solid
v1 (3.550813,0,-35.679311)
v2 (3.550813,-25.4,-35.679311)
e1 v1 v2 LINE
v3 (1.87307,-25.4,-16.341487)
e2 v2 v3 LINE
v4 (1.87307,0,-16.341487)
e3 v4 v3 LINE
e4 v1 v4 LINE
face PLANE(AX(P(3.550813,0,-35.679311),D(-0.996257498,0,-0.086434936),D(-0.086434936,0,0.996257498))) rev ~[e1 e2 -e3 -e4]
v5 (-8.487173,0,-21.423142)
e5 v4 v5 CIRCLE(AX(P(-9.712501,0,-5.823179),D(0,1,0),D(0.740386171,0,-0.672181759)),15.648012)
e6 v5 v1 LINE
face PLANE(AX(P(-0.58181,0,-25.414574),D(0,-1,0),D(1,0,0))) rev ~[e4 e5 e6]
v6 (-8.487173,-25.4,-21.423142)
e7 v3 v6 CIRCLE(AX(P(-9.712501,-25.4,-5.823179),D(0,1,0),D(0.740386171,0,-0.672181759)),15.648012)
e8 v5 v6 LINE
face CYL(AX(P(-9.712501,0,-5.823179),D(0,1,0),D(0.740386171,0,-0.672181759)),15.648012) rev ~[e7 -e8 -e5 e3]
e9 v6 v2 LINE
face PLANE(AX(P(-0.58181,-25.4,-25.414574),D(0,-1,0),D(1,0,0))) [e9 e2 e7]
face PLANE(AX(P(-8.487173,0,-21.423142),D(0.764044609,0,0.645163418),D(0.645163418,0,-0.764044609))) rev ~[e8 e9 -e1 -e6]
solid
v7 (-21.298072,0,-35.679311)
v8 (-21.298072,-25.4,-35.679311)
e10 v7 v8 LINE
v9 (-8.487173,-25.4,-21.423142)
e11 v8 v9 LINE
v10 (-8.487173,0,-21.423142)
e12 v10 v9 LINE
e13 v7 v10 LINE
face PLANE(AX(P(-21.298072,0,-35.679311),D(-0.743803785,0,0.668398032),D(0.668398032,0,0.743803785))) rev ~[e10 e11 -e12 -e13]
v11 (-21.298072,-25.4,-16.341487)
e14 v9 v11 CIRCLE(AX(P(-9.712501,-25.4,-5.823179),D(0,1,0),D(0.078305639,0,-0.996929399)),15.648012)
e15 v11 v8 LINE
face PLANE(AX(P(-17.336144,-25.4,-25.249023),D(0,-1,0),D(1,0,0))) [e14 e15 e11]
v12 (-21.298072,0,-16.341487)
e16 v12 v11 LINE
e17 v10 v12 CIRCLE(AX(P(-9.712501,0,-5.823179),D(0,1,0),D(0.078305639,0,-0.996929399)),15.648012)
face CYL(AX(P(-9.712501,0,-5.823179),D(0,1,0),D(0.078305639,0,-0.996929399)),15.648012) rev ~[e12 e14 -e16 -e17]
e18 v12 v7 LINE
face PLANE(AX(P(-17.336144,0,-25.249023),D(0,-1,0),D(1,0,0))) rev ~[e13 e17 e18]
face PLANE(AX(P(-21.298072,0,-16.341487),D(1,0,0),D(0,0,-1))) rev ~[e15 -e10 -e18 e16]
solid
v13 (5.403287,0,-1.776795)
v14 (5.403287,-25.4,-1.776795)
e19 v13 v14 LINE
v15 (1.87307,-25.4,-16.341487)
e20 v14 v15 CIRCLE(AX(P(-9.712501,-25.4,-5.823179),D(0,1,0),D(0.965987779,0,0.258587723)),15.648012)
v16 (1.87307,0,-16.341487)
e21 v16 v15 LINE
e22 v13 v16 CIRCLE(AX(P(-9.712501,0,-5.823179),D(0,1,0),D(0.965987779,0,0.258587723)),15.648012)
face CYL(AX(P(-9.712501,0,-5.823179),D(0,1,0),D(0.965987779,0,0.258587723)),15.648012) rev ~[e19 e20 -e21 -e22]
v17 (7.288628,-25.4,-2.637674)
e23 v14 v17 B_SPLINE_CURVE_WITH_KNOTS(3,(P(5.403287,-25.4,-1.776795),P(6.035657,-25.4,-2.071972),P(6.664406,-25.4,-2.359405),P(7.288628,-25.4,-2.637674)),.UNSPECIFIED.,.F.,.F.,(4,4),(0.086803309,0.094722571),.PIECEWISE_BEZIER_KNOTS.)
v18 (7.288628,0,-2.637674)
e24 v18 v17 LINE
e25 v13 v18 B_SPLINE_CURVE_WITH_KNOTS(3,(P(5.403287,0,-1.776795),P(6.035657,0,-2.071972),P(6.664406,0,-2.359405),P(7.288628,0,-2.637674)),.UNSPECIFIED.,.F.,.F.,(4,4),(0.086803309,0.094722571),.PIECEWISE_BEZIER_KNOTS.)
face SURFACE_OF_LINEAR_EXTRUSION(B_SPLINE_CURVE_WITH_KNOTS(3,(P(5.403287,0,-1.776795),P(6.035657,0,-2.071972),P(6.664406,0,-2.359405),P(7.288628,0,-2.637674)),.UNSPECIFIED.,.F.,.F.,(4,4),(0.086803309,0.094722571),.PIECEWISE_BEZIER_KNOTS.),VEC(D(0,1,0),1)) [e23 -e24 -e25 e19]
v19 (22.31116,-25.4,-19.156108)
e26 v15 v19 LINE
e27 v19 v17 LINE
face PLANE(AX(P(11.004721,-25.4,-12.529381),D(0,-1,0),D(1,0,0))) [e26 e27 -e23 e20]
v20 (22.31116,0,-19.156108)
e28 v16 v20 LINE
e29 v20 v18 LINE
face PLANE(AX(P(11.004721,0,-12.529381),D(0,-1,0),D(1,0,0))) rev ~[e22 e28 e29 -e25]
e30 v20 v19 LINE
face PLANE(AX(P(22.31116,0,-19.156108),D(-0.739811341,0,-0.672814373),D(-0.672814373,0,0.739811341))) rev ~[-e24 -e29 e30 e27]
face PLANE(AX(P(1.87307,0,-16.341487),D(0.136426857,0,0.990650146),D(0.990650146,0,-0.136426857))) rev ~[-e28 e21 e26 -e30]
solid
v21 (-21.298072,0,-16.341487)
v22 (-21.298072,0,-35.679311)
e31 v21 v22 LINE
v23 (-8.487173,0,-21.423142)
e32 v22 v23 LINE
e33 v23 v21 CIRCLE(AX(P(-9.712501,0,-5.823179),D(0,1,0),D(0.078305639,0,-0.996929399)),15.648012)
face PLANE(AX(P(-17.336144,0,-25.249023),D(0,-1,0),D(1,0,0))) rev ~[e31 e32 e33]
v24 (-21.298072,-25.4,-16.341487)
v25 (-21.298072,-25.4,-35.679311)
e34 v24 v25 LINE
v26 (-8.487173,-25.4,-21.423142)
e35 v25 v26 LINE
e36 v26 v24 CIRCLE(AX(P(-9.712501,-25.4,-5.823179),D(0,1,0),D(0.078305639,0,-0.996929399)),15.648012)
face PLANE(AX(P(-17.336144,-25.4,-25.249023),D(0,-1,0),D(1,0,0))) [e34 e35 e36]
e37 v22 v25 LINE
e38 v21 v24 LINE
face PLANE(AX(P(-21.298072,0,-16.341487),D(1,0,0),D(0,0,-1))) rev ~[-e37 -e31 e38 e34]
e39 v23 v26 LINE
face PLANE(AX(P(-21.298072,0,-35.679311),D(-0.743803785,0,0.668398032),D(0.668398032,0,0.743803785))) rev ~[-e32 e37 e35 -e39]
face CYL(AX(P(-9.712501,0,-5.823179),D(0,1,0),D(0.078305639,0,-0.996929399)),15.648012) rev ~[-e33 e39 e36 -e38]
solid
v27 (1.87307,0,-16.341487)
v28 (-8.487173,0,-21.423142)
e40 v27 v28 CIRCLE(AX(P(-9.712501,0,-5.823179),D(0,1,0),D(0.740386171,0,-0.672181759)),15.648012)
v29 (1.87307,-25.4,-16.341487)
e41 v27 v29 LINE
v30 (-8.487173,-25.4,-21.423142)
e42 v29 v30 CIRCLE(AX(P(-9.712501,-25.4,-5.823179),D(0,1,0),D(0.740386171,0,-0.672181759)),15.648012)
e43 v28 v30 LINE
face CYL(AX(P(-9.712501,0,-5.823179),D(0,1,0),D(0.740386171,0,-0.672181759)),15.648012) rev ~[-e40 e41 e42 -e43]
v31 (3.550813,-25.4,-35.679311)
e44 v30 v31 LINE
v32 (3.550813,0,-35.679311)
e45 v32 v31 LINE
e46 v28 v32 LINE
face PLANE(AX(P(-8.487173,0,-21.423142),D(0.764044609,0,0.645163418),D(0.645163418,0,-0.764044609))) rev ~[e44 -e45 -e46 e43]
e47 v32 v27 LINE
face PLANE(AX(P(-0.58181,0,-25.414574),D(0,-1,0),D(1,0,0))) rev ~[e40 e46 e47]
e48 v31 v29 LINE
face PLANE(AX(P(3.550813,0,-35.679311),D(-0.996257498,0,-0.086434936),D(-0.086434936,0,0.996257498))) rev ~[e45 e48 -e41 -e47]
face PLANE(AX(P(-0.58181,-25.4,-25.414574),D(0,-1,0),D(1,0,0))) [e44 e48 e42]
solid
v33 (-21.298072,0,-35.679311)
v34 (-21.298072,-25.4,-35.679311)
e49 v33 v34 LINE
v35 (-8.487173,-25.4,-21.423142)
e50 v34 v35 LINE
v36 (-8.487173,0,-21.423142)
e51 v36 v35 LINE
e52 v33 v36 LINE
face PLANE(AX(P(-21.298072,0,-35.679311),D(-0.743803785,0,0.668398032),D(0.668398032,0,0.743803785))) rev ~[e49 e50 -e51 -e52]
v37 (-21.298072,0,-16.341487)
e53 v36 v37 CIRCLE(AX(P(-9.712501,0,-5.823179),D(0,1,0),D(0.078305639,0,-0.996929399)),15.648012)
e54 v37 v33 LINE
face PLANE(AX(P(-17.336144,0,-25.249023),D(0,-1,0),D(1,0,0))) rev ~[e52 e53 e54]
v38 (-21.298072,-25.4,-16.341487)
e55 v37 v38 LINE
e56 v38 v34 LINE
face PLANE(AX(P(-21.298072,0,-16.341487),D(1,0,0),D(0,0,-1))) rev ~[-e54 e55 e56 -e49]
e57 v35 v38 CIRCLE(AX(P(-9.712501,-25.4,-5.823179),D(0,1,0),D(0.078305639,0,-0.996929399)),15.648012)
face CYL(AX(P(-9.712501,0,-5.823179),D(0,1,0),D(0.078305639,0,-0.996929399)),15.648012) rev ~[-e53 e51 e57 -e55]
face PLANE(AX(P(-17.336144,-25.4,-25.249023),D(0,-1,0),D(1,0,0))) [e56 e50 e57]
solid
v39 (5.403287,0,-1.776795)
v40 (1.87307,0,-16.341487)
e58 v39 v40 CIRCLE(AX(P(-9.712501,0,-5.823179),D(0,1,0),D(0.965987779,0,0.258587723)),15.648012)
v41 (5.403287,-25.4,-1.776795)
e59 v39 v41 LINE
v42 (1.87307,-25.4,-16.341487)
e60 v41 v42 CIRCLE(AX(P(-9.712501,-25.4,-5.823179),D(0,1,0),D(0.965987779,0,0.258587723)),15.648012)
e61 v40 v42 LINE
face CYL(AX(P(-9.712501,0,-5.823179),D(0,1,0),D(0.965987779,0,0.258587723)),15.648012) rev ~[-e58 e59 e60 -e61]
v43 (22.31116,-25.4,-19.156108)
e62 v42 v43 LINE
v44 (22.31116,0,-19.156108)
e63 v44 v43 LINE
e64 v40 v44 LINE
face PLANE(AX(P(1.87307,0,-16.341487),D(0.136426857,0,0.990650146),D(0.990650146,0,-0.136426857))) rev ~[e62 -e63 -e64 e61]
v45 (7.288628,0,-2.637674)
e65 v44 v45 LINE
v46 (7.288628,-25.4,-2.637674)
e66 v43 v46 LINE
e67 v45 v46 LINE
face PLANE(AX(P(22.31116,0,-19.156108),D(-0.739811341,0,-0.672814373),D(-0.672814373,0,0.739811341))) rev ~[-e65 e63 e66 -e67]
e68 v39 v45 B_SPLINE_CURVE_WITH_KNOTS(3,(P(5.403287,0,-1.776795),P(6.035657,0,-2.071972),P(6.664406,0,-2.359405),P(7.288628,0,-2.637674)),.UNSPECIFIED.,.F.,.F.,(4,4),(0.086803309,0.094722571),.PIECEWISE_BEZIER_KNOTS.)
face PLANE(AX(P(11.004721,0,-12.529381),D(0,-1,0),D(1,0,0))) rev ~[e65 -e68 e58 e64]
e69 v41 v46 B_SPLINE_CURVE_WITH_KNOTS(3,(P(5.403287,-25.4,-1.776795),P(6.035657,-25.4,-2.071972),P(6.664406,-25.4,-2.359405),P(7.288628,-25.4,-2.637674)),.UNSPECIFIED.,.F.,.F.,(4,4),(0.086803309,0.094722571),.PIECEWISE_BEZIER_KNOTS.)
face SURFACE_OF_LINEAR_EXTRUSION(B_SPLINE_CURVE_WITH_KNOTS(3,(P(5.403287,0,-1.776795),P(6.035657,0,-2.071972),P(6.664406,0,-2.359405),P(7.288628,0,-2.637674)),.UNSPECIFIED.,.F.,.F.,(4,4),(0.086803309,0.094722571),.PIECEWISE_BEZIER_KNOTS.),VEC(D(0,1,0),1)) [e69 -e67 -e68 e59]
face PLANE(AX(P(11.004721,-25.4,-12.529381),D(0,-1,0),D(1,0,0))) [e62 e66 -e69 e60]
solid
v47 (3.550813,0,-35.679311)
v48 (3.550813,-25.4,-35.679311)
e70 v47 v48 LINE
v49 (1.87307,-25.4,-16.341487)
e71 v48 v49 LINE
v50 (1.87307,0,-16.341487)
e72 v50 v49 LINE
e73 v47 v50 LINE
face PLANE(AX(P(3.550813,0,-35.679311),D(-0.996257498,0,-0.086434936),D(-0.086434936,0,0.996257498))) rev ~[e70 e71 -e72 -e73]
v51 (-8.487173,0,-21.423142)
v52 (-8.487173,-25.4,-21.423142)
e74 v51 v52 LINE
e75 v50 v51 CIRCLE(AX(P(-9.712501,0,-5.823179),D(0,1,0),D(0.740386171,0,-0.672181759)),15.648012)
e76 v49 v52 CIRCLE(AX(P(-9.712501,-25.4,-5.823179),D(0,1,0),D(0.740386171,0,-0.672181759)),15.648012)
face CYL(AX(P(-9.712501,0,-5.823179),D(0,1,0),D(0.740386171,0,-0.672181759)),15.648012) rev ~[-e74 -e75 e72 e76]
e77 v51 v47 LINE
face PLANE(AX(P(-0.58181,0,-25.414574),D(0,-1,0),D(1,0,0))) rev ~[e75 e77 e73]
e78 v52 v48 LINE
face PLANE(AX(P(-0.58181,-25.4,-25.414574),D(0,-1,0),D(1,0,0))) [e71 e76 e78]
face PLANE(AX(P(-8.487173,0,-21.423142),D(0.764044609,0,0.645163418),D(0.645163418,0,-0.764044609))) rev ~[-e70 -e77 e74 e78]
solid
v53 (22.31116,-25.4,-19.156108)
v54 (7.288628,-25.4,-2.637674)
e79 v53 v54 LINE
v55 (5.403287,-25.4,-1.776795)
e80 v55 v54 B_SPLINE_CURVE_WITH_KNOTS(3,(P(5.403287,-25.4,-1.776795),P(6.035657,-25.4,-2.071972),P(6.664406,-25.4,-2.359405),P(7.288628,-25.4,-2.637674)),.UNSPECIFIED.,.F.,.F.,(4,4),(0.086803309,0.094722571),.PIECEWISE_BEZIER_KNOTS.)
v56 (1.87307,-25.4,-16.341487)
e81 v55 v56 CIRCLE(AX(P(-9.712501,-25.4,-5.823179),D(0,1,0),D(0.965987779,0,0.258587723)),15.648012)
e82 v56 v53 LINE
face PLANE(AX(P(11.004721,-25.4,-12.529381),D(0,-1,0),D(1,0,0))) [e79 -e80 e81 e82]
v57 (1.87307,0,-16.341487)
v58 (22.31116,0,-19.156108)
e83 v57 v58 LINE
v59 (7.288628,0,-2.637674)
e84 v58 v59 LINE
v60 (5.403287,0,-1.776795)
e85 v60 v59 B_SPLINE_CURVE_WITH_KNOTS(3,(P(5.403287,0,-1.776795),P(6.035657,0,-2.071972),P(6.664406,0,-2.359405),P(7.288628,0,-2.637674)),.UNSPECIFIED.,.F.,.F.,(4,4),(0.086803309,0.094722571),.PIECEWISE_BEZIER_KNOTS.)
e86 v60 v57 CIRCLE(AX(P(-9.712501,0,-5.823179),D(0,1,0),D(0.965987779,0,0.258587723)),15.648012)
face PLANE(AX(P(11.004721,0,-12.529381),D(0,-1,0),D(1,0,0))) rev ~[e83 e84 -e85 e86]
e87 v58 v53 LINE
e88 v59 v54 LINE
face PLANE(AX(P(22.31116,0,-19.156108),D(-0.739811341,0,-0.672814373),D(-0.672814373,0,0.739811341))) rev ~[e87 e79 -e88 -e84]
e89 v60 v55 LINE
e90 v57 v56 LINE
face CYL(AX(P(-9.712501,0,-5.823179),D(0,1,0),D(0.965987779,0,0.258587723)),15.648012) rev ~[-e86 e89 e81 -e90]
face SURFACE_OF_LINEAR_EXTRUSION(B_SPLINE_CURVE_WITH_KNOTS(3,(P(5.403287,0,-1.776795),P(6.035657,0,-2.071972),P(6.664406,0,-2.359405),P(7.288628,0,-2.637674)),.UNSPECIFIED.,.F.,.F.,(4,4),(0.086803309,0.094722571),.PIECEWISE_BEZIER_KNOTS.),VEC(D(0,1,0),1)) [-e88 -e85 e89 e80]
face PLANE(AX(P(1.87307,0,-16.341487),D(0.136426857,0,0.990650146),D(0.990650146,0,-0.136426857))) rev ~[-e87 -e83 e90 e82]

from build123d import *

# Parameters (mm, degrees)
F2_DEPTH = 25.4
F3_DEPTH = 25.4
F4_DEPTH = 25.4


# Not quite as in the source:
# - the program builds the solid bodies; features that only make, move or delete a surface that nothing else refers to are left out


with BuildPart() as f2:
    # F0 (on Front) → F2 (new body)
    with BuildSketch(Plane.XZ):
        with BuildLine():
            Line((-21.2980724055, -35.6793105602), (-8.4871734768, -21.4231418318))
            ThreePointArc((-8.4871734768, -21.4231418318), (-15.4822035317, -20.368652553), (-21.2980724055, -16.3414870052))
            Line((-21.2980724055, -16.3414870052), (-21.2980724055, -35.6793105602))
        make_face()
    extrude(amount=F2_DEPTH)


with BuildPart() as f2b:
    # F0 (on Front) → F2, piece 2 (new body)
    with BuildSketch(Plane.XZ):
        with BuildLine():
            Line((3.5508128349, -35.6793105602), (1.8730703471, -16.3414870052))
            ThreePointArc((1.8730703471, -16.3414870052), (-2.8215223771, -19.8721889655), (-8.4871734768, -21.4231418318))
            Line((-8.4871734768, -21.4231418318), (3.5508128349, -35.6793105602))
        make_face()
    extrude(amount=F2_DEPTH)


with BuildPart() as f2c:
    # F0 (on Front) → F2, piece 3 (new body)
    with BuildSketch(Plane.XZ):
        with BuildLine():
            Line((22.3111603409, -19.156107679), (7.2886282847, -2.6376740133))
            add(Edge.make_bspline(
                [(5.4032869201, -1.7767953694), (6.0356572868, -2.0719724376), (6.6644062734, -2.3594052932), (7.2886282847, -2.6376740133)],
                knots=[0.0868033089, 0.0868033089, 0.0868033089, 0.0868033089, 0.0947225706, 0.0947225706, 0.0947225706, 0.0947225706], degree=3))
            ThreePointArc((5.4032869201, -1.7767953694), (5.4951683541, -9.5092417491), (1.8730703471, -16.3414870052))
            Line((1.8730703471, -16.3414870052), (22.3111603409, -19.156107679))
        make_face()
    extrude(amount=F2_DEPTH)


with BuildPart() as f3:
    # F0 (on Front) → F3 (new body)
    with BuildSketch(Plane.XZ):
        with BuildLine():
            Line((-21.2980724055, -35.6793105602), (-8.4871734768, -21.4231418318))
            ThreePointArc((-8.4871734768, -21.4231418318), (-15.4822035317, -20.368652553), (-21.2980724055, -16.3414870052))
            Line((-21.2980724055, -16.3414870052), (-21.2980724055, -35.6793105602))
        make_face()
    extrude(amount=F3_DEPTH)


with BuildPart() as f3b:
    # F0 (on Front) → F3, piece 2 (new body)
    with BuildSketch(Plane.XZ):
        with BuildLine():
            Line((3.5508128349, -35.6793105602), (1.8730703471, -16.3414870052))
            ThreePointArc((1.8730703471, -16.3414870052), (-2.8215223771, -19.8721889655), (-8.4871734768, -21.4231418318))
            Line((-8.4871734768, -21.4231418318), (3.5508128349, -35.6793105602))
        make_face()
    extrude(amount=F3_DEPTH)


with BuildPart() as f3c:
    # F0 (on Front) → F3, piece 3 (new body)
    with BuildSketch(Plane.XZ):
        with BuildLine():
            Line((22.3111603409, -19.156107679), (7.2886282847, -2.6376740133))
            add(Edge.make_bspline(
                [(5.4032869201, -1.7767953694), (6.0356572868, -2.0719724376), (6.6644062734, -2.3594052932), (7.2886282847, -2.6376740133)],
                knots=[0.0868033089, 0.0868033089, 0.0868033089, 0.0868033089, 0.0947225706, 0.0947225706, 0.0947225706, 0.0947225706], degree=3))
            ThreePointArc((5.4032869201, -1.7767953694), (5.4951683541, -9.5092417491), (1.8730703471, -16.3414870052))
            Line((1.8730703471, -16.3414870052), (22.3111603409, -19.156107679))
        make_face()
    extrude(amount=F3_DEPTH)


with BuildPart() as f4:
    # F0 (on Front) → F4 (new body)
    with BuildSketch(Plane.XZ):
        with BuildLine():
            Line((-21.2980724055, -35.6793105602), (-8.4871734768, -21.4231418318))
            ThreePointArc((-8.4871734768, -21.4231418318), (-15.4822035317, -20.368652553), (-21.2980724055, -16.3414870052))
            Line((-21.2980724055, -16.3414870052), (-21.2980724055, -35.6793105602))
        make_face()
    extrude(amount=F4_DEPTH)


with BuildPart() as f4b:
    # F0 (on Front) → F4, piece 2 (new body)
    with BuildSketch(Plane.XZ):
        with BuildLine():
            Line((3.5508128349, -35.6793105602), (1.8730703471, -16.3414870052))
            ThreePointArc((1.8730703471, -16.3414870052), (-2.8215223771, -19.8721889655), (-8.4871734768, -21.4231418318))
            Line((-8.4871734768, -21.4231418318), (3.5508128349, -35.6793105602))
        make_face()
    extrude(amount=F4_DEPTH)


with BuildPart() as f4c:
    # F0 (on Front) → F4, piece 3 (new body)
    with BuildSketch(Plane.XZ):
        with BuildLine():
            Line((22.3111603409, -19.156107679), (7.2886282847, -2.6376740133))
            add(Edge.make_bspline(
                [(5.4032869201, -1.7767953694), (6.0356572868, -2.0719724376), (6.6644062734, -2.3594052932), (7.2886282847, -2.6376740133)],
                knots=[0.0868033089, 0.0868033089, 0.0868033089, 0.0868033089, 0.0947225706, 0.0947225706, 0.0947225706, 0.0947225706], degree=3))
            ThreePointArc((5.4032869201, -1.7767953694), (5.4951683541, -9.5092417491), (1.8730703471, -16.3414870052))
            Line((1.8730703471, -16.3414870052), (22.3111603409, -19.156107679))
        make_face()
    extrude(amount=F4_DEPTH)


solid = Compound([f2.part, f2b.part, f2c.part, f3.part, f3b.part, f3c.part, f4.part, f4b.part, f4c.part])
